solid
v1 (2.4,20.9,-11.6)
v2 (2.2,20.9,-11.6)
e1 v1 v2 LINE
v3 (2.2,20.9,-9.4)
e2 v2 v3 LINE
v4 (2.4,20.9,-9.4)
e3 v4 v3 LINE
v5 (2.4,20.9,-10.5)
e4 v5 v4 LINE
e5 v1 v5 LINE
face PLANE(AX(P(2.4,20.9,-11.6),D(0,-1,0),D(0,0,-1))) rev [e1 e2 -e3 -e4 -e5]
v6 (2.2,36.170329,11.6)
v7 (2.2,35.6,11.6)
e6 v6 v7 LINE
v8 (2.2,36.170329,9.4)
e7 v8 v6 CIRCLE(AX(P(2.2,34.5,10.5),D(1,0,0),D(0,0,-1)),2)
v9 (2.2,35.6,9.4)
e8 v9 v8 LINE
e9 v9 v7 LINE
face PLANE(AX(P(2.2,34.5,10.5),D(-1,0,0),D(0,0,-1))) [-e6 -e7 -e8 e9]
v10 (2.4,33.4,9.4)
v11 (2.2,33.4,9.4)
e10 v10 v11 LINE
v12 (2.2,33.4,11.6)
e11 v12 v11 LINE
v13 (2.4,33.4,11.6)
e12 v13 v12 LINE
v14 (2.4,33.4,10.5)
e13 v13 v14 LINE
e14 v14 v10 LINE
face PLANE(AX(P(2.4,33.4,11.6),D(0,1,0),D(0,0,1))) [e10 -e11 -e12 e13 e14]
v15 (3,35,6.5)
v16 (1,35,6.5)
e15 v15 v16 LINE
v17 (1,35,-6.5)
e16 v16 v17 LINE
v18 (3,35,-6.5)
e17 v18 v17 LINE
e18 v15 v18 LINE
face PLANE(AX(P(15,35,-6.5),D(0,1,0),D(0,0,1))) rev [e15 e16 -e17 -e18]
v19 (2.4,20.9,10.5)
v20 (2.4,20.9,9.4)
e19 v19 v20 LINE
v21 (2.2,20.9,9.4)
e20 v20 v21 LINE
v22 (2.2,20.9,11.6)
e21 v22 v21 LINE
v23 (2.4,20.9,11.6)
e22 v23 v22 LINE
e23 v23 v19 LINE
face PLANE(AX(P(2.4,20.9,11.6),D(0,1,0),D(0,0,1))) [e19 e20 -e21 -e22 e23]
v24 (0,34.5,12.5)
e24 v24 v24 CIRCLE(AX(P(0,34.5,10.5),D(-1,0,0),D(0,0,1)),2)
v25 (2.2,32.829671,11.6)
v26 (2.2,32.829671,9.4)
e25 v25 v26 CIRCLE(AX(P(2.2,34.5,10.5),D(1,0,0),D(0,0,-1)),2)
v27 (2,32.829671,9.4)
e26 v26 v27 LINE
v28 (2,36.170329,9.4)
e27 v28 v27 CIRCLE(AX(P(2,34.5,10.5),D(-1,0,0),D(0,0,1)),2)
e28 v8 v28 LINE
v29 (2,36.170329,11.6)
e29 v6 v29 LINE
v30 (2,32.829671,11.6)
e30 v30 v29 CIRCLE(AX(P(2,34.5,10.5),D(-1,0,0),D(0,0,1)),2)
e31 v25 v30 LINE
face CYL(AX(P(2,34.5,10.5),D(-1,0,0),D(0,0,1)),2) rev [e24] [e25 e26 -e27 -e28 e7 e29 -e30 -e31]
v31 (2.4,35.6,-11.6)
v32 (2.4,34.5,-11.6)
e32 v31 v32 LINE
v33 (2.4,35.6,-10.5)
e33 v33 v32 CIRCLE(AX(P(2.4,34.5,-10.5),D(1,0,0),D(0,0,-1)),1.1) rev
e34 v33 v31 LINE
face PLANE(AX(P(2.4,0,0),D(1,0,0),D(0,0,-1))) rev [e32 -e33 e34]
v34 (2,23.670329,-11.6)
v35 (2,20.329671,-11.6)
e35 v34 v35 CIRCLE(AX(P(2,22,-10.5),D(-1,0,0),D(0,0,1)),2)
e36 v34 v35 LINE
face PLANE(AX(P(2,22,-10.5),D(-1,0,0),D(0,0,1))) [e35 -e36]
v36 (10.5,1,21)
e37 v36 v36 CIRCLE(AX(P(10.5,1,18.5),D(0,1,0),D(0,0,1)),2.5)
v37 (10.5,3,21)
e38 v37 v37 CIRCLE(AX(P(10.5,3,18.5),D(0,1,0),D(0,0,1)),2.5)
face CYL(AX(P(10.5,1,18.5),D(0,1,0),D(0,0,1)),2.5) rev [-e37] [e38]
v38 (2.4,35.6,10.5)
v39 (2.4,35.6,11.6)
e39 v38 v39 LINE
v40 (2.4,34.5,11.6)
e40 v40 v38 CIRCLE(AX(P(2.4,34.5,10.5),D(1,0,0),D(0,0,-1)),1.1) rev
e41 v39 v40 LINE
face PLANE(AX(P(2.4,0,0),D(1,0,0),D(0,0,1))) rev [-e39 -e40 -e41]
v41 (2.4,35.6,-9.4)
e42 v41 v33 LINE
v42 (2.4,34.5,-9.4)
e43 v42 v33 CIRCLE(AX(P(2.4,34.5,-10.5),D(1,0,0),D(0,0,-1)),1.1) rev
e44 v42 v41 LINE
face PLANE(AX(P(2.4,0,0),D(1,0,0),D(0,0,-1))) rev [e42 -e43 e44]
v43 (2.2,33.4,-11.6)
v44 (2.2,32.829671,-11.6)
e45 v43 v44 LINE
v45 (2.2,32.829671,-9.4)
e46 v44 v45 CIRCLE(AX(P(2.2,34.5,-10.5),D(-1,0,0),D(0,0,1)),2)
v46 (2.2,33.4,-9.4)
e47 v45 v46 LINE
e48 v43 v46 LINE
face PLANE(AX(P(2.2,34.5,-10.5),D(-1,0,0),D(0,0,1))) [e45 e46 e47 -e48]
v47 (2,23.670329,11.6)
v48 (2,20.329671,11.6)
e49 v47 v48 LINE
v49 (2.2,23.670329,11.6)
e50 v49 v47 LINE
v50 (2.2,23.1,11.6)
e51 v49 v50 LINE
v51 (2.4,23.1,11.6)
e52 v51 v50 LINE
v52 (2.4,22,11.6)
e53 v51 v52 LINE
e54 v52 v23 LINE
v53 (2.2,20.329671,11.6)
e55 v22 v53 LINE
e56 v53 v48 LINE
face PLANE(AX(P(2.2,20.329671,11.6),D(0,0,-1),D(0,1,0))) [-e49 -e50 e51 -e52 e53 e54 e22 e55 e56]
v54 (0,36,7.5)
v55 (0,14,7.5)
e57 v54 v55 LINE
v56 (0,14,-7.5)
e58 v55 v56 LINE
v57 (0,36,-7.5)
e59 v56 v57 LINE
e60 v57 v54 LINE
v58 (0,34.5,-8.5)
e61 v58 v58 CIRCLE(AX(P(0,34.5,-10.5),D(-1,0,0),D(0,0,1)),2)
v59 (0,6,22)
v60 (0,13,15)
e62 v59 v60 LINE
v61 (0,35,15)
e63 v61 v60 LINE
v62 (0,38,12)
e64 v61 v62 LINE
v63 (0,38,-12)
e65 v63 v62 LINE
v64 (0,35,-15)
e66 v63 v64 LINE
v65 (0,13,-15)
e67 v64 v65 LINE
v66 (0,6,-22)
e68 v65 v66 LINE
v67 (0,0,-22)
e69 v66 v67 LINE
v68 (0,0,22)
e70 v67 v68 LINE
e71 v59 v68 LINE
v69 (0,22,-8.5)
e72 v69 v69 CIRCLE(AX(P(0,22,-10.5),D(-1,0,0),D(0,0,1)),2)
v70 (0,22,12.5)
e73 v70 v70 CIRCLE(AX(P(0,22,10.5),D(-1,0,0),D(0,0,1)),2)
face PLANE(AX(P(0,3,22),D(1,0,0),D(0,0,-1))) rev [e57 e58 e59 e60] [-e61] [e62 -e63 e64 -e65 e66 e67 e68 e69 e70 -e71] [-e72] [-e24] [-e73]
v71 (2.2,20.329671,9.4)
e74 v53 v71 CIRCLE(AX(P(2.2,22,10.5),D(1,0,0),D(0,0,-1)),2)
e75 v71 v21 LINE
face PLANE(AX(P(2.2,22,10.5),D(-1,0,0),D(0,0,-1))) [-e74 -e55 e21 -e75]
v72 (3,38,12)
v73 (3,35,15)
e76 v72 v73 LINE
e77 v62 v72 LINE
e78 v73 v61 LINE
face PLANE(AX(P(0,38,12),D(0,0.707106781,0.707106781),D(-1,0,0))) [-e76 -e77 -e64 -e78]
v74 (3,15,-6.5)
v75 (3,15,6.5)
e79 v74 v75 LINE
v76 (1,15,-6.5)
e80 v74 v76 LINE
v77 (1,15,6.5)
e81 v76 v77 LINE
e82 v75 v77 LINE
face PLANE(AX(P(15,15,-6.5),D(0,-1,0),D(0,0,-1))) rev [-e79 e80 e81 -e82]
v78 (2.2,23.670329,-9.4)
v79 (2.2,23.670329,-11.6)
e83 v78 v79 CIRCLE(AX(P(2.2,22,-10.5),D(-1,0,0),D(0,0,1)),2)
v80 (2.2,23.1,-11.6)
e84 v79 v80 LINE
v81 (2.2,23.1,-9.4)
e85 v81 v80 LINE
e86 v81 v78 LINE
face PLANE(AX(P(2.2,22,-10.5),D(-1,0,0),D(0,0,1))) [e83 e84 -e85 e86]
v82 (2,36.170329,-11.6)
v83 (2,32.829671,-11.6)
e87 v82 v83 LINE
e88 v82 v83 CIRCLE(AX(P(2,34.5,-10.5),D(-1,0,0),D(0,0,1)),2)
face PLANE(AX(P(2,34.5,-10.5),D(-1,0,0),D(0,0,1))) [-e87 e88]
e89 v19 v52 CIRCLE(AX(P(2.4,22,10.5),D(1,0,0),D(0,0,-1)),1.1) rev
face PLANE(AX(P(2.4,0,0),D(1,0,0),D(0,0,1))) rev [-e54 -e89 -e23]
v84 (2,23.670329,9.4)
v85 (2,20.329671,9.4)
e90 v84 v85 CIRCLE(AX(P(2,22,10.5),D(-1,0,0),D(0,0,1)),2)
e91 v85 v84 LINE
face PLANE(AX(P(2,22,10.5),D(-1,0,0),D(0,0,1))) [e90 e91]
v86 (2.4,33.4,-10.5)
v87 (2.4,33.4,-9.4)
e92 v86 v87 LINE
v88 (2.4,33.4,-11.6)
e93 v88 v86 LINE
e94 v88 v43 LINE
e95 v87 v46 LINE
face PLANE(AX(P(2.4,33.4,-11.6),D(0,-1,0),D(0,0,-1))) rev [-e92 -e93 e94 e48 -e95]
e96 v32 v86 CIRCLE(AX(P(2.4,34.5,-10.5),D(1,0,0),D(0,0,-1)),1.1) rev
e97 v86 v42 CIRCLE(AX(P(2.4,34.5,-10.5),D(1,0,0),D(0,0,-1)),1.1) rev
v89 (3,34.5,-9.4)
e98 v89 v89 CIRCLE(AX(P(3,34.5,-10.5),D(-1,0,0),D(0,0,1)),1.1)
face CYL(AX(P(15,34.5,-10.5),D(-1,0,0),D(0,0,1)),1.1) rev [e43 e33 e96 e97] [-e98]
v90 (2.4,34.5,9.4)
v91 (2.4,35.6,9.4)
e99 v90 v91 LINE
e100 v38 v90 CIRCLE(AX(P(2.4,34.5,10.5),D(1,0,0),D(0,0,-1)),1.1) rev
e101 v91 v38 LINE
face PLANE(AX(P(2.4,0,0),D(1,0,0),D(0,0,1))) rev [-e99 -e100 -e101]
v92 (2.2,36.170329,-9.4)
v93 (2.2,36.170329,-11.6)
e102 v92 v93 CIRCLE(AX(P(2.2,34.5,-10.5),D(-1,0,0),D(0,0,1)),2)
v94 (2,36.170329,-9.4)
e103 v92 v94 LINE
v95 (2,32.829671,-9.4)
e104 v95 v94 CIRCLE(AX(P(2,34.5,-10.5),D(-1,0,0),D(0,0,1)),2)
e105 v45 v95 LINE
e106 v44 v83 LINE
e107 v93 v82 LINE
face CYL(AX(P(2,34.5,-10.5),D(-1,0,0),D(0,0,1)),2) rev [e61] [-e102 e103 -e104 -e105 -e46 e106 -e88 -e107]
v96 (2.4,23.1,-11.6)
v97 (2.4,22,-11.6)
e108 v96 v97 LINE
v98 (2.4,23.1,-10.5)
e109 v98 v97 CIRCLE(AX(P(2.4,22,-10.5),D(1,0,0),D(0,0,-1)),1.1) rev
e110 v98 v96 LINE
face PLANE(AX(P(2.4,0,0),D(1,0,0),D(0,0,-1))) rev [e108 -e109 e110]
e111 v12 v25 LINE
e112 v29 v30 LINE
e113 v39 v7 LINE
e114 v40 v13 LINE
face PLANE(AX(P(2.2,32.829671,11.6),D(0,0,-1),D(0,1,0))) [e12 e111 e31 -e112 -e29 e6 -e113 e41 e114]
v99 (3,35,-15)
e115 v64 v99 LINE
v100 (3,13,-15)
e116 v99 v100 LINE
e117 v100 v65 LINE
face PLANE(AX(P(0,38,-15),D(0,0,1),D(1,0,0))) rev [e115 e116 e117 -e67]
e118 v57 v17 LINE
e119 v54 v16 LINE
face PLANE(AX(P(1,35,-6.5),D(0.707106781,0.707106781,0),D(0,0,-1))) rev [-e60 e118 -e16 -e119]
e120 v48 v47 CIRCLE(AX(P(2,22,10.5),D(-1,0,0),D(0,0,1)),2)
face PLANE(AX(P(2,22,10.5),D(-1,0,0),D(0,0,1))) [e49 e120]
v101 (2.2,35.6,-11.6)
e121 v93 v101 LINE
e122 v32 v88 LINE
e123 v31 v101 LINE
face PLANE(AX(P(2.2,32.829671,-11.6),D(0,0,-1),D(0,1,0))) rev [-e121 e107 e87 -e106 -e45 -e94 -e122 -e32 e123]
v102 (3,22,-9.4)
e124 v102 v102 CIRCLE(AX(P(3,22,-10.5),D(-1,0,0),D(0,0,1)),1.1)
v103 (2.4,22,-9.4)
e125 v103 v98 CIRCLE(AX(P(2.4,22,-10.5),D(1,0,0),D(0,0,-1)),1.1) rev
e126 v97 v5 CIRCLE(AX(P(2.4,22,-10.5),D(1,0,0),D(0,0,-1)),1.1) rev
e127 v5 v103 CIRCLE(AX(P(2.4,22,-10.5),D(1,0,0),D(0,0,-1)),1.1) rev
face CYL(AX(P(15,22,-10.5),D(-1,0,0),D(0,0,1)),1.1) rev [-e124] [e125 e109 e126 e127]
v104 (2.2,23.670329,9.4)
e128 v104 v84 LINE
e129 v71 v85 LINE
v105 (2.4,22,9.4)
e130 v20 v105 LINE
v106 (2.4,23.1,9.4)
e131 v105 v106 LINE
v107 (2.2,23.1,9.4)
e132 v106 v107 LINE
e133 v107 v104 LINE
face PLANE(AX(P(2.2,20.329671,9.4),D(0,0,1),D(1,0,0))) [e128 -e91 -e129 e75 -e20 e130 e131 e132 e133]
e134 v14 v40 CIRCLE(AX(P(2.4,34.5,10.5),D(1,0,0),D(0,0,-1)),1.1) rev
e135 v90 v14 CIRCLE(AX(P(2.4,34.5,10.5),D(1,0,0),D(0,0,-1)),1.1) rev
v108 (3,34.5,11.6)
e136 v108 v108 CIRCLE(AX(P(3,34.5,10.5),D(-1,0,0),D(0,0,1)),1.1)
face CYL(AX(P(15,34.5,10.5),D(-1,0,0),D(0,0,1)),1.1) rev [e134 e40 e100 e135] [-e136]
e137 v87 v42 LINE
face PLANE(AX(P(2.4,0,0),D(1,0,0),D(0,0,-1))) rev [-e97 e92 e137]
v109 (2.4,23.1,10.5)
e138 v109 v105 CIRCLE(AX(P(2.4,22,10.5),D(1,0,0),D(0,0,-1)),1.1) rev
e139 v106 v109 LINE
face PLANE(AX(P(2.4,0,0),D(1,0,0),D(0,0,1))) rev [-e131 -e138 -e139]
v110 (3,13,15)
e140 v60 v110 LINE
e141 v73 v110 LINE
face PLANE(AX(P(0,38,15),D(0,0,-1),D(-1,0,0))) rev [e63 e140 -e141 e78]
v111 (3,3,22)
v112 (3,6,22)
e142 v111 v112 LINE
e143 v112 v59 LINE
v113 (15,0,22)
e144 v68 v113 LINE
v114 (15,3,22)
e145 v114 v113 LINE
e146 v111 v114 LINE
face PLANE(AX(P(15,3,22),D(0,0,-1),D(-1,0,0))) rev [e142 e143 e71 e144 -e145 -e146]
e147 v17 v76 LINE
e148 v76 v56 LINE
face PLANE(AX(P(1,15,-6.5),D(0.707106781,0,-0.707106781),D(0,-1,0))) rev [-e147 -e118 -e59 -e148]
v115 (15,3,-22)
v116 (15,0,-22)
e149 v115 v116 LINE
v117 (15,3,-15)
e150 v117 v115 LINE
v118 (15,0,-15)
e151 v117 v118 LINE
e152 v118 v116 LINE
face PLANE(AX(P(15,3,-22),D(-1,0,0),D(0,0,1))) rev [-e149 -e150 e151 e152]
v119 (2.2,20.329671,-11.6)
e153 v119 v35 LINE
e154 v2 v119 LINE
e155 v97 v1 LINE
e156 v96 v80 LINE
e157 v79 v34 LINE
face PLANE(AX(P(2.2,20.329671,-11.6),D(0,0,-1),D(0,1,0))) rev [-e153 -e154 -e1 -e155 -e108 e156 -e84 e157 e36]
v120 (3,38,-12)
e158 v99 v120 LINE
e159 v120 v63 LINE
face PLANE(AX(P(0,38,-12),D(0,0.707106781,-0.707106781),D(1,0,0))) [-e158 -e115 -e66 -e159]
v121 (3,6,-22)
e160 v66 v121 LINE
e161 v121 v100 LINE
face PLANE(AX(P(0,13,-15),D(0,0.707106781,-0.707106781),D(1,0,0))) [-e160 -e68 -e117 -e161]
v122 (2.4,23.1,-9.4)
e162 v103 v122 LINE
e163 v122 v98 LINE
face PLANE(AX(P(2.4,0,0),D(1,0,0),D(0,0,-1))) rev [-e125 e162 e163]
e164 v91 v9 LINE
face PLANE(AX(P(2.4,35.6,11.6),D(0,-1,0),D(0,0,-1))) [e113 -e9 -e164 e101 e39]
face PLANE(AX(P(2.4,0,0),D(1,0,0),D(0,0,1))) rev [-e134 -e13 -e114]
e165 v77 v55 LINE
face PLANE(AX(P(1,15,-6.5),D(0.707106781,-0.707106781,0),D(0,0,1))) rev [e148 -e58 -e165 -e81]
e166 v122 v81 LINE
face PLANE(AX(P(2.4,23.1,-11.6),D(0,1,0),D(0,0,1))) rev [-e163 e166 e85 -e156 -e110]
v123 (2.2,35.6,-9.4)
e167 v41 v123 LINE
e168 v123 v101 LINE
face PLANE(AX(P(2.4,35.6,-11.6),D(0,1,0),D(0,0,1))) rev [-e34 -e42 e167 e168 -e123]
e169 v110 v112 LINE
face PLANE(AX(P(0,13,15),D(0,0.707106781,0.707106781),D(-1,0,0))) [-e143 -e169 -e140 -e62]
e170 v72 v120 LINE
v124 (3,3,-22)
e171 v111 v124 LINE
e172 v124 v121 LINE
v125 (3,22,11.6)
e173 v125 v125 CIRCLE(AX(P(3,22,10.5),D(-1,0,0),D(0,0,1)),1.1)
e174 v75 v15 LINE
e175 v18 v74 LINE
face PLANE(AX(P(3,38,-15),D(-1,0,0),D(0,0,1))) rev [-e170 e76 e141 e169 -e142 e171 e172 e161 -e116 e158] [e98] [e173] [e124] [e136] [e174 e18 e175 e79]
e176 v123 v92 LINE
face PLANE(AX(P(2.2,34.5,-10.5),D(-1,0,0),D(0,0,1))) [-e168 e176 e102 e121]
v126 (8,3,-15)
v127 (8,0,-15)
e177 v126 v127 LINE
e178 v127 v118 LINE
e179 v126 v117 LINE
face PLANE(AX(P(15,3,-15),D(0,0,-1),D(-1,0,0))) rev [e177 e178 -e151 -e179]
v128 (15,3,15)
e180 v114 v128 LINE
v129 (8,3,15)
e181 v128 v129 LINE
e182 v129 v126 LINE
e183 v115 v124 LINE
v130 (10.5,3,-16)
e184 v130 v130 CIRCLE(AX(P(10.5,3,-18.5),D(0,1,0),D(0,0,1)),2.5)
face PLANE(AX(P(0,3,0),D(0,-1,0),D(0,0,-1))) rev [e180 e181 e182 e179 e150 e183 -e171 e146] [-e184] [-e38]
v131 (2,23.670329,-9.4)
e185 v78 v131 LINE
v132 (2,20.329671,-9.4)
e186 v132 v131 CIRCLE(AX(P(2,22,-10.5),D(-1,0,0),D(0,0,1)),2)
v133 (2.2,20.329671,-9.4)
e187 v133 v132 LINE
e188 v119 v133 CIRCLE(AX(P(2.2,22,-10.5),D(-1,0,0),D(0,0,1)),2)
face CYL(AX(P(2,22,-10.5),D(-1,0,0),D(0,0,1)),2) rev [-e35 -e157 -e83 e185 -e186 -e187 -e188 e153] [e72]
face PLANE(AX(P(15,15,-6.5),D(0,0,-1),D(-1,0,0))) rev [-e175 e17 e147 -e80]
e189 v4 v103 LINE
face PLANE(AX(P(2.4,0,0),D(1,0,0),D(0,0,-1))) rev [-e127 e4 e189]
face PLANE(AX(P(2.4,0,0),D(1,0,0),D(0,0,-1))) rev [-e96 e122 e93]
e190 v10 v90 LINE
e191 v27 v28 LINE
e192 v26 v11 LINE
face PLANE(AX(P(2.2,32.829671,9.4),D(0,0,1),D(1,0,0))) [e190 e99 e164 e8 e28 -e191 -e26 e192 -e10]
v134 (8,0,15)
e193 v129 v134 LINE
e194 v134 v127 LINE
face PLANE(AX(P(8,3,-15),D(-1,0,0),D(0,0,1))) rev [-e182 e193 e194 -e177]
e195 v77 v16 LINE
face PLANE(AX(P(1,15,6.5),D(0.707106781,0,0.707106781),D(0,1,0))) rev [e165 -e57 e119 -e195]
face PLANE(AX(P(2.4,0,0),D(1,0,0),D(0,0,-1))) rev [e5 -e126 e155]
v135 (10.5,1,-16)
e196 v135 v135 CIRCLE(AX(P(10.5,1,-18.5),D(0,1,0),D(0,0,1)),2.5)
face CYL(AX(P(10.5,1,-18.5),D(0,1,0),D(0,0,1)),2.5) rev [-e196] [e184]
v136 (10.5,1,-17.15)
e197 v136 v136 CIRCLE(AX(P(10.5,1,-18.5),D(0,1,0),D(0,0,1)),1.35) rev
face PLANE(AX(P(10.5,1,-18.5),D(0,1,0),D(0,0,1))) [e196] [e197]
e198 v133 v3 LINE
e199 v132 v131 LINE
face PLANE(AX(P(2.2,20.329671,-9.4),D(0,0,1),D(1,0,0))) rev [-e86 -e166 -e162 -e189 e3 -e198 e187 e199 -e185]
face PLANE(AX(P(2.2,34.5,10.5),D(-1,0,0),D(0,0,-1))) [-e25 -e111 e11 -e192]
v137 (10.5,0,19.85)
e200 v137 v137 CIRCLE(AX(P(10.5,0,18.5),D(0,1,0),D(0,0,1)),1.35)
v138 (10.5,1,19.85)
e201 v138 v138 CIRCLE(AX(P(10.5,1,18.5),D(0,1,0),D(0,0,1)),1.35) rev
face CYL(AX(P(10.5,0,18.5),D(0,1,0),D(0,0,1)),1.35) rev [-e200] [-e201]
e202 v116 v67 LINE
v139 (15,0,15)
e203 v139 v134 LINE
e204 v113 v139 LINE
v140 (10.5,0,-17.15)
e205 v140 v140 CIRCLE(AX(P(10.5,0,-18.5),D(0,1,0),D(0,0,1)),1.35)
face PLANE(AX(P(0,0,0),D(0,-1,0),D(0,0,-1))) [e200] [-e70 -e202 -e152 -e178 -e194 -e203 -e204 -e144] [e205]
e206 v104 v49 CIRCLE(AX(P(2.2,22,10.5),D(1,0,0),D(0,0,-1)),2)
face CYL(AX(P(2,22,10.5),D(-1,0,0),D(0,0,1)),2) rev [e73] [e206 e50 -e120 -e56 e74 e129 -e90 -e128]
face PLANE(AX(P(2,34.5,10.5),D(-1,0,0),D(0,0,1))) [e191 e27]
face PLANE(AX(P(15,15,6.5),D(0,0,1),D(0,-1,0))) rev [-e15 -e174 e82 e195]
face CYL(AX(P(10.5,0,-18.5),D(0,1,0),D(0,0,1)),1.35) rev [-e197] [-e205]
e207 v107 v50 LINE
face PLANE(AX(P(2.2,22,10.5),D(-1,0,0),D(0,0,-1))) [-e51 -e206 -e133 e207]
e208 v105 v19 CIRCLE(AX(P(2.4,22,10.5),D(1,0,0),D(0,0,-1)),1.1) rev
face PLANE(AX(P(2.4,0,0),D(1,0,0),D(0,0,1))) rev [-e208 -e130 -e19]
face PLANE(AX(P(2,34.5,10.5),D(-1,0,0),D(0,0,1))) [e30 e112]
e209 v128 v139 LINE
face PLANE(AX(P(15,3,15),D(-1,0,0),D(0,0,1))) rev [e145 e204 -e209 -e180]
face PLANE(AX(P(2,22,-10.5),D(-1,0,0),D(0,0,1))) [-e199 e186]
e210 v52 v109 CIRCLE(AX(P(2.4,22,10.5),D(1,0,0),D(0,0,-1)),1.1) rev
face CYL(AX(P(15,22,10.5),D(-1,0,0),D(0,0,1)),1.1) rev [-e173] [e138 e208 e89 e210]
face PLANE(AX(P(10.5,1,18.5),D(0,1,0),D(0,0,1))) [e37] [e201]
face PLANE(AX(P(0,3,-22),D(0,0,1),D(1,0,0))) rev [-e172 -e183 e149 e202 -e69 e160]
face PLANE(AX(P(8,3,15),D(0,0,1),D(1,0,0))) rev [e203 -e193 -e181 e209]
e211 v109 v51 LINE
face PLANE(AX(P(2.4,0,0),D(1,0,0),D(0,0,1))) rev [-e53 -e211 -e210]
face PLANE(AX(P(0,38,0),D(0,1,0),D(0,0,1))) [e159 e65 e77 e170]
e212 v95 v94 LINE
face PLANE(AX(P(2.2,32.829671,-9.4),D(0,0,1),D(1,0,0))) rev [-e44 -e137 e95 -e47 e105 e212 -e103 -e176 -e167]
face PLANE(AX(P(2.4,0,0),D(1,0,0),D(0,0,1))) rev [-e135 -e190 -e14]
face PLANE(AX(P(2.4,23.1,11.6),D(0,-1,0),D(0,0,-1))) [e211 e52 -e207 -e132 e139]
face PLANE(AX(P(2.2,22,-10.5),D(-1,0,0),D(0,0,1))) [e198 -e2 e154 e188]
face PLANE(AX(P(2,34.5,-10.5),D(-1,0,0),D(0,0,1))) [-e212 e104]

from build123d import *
from build123d.topology import SkipClean

# Parameters (mm, degrees)
BOSS_EXTRUDE1_DEPTH = 3
SKETCH2_R           = 1.35
CUT_EXTRUDE1_DEPTH  = 27.795522014
SKETCH3_R           = 2.5
CUT_EXTRUDE2_DEPTH  = 2
SKETCH4_W           = 3
SKETCH4_H           = 30
BOSS_EXTRUDE2_DEPTH = 35
SKETCH5_R           = 1.1
CUT_EXTRUDE3_DEPTH  = 47.400431032
SKETCH6_W           = 13
SKETCH6_H           = 20
CUT_EXTRUDE4_DEPTH  = 47.400431032
CHAMFER1_SIZE       = 10
CHAMFER2_SIZE       = 1
CHAMFER3_SIZE       = 3
SKETCH7_R           = 2
CUT_EXTRUDE5_DEPTH  = 2
CUT_EXTRUDE6_DEPTH  = 0.2
SKETCH9_W           = 2.2
SKETCH9_H           = 2.2
CUT_EXTRUDE7_DEPTH  = 0.2


with BuildPart() as part:
    # Sketch1 → Boss-Extrude1 (new body)
    with BuildSketch(Plane(origin=(0, 0, 0), x_dir=(1, 0, 0), z_dir=(0, 1, 0))):
        Polygon((0, -22), (0, 22), (15, 22), (15, 15), (8, 15), (8, -15), (15, -15), (15, -22), align=None)
    extrude(amount=BOSS_EXTRUDE1_DEPTH)

    # Sketch2 → Cut-Extrude1 (cut, through all)
    with BuildSketch(Plane(origin=(0, 3, 0), x_dir=(1, 0, 0), z_dir=(0, 1, 0))):
        with Locations(Location((10.5, 18.5, 0), (0, 0, 270))):
            Circle(SKETCH2_R)
        with Locations(Location((10.5, -18.5, 0), (0, 0, 270))):
            Circle(SKETCH2_R)
    extrude(amount=-CUT_EXTRUDE1_DEPTH, mode=Mode.SUBTRACT)

    # Sketch3 → Cut-Extrude2 (cut)
    with BuildSketch(Plane(origin=(0, 3, 0), x_dir=(1, 0, 0), z_dir=(0, 1, 0))):
        with Locations(Location((10.5, 18.5, 0), (0, 0, 270))):
            Circle(SKETCH3_R)
        with Locations(Location((10.5, -18.5, 0), (0, 0, 270))):
            Circle(SKETCH3_R)
    extrude(amount=-CUT_EXTRUDE2_DEPTH, mode=Mode.SUBTRACT)

    # Sketch4 → Boss-Extrude2 (add)
    with BuildSketch(Plane(origin=(0, 3, 0), x_dir=(1, 0, 0), z_dir=(0, 1, 0))):
        with Locations((1.5, 0)):
            Rectangle(SKETCH4_W, SKETCH4_H)
    extrude(amount=BOSS_EXTRUDE2_DEPTH)

    # Sketch5 → Cut-Extrude3 (cut, through all)
    with BuildSketch(Plane.ZY):
        with Locations((-10.5, 34.5)):
            Circle(SKETCH5_R)
        with Locations((10.5, 34.5)):
            Circle(SKETCH5_R)
        with Locations((10.5, 22)):
            Circle(SKETCH5_R)
        with Locations((-10.5, 22)):
            Circle(SKETCH5_R)
    extrude(amount=-CUT_EXTRUDE3_DEPTH, mode=Mode.SUBTRACT)

    # Sketch6 → Cut-Extrude4 (cut, through all)
    with BuildSketch(Plane.ZY):
        with Locations((0, 25)):
            Rectangle(SKETCH6_W, SKETCH6_H)
    extrude(amount=-CUT_EXTRUDE4_DEPTH, mode=Mode.SUBTRACT)

    # Chamfer1
    # the kernel refuses this chamfer: 10 mm, written as the material it adds along each edge
    with BuildSketch(Plane(origin=(0, 3, -15), x_dir=(0, -0.02749587661058636, -0.9996219169112968), z_dir=(1, 0, 0))) as chamfer1_piece_1_section:
        Polygon((CHAMFER1_SIZE * 0.999621916911, CHAMFER1_SIZE * 0.0274958766106), (-CHAMFER1_SIZE * 0.0274958766106, CHAMFER1_SIZE * 0.999621916911), (0, 0), align=None)
    chamfer1_piece_1 = extrude(amount=3, mode=Mode.PRIVATE)
    chamfer1_piece_1 = split(chamfer1_piece_1, bisect_by=Plane(origin=(1.5, 6.564102564, -22), z_dir=(0, 0, 1)), keep=Keep.TOP, mode=Mode.PRIVATE)
    add(chamfer1_piece_1)
    with BuildSketch(Plane(origin=(3, 3, 15), x_dir=(0, -0.02749587661058636, 0.9996219169112968), z_dir=(-1, 0, 0))) as chamfer1_piece_2_section:
        Polygon((CHAMFER1_SIZE * 0.999621916911, CHAMFER1_SIZE * 0.0274958766106), (-CHAMFER1_SIZE * 0.0274958766106, CHAMFER1_SIZE * 0.999621916911), (0, 0), align=None)
    chamfer1_piece_2 = extrude(amount=3, mode=Mode.PRIVATE)
    chamfer1_piece_2 = split(chamfer1_piece_2, bisect_by=Plane(origin=(1.5, 6.564102564, 22), z_dir=(0, 0, -1)), keep=Keep.TOP, mode=Mode.PRIVATE)
    add(chamfer1_piece_2)

    # Chamfer2
    chamfer2_edges = [part.edges().sort_by_distance(p)[0] for p in [
        (0, 25, -6.5),
        (0, 15, 0),
        (0, 25, 6.5),
        (0, 35, 0),
    ]]
    chamfer(chamfer2_edges, length=CHAMFER2_SIZE)

    # Chamfer3
    chamfer3_edges = [part.edges().sort_by_distance(p)[0] for p in [
        (1.5, 38, 15),
        (1.5, 38, -15),
    ]]
    chamfer(chamfer3_edges, length=CHAMFER3_SIZE)

    # Sketch7 → Cut-Extrude5 (cut)
    with BuildSketch(Plane.ZY):
        with Locations((-10.5, 34.5)):
            Circle(SKETCH7_R)
        with Locations((10.5, 34.5)):
            Circle(SKETCH7_R)
        with Locations((10.5, 22)):
            Circle(SKETCH7_R)
        with Locations((-10.5, 22)):
            Circle(SKETCH7_R)
    extrude(amount=-CUT_EXTRUDE5_DEPTH, mode=Mode.SUBTRACT)

    # Sketch8 → Cut-Extrude6 (cut)
    with SkipClean():  # the faces are left unmerged after this step: merging them gives an invalid solid
        with BuildSketch(Plane.ZY.offset(-2)):
            with BuildLine():
                Line((-11.6, 32.829670691), (-11.6, 36.170329309))
                ThreePointArc((-11.6, 36.170329309), (-10.5, 36.5), (-9.4, 36.170329309))
                Line((-9.4, 36.170329309), (-9.4, 32.829670691))
                ThreePointArc((-9.4, 32.829670691), (-10.5, 32.5), (-11.6, 32.829670691))
            make_face()
            with BuildLine():
                Line((-11.6, 20.329670691), (-11.6, 23.670329309))
                ThreePointArc((-11.6, 23.670329309), (-10.5, 24), (-9.4, 23.670329309))
                Line((-9.4, 23.670329309), (-9.4, 20.329670691))
                ThreePointArc((-9.4, 20.329670691), (-10.5, 20), (-11.6, 20.329670691))
            make_face()
        cut_extrude6 = extrude(amount=-CUT_EXTRUDE6_DEPTH, mode=Mode.SUBTRACT)

    # Sketch9 → Cut-Extrude7 (cut)
    with SkipClean():  # the faces are left unmerged after this step: merging them gives an invalid solid
        with BuildSketch(Plane.ZY.offset(-2.2)):
            with Locations((-10.5, 22)):
                Rectangle(SKETCH9_W, SKETCH9_H)
            with Locations((-10.5, 34.5)):
                Rectangle(SKETCH9_W, SKETCH9_H)
        cut_extrude7 = extrude(amount=-CUT_EXTRUDE7_DEPTH, mode=Mode.SUBTRACT)

    # Mirror1: Cut-Extrude6, Cut-Extrude7 across plane
    with SkipClean():  # the faces are left unmerged after this step: merging them gives an invalid solid
        add(cut_extrude6.mirror(Plane.XY), mode=Mode.SUBTRACT)
        add(cut_extrude7.mirror(Plane.XY), mode=Mode.SUBTRACT)


solid = part.part
